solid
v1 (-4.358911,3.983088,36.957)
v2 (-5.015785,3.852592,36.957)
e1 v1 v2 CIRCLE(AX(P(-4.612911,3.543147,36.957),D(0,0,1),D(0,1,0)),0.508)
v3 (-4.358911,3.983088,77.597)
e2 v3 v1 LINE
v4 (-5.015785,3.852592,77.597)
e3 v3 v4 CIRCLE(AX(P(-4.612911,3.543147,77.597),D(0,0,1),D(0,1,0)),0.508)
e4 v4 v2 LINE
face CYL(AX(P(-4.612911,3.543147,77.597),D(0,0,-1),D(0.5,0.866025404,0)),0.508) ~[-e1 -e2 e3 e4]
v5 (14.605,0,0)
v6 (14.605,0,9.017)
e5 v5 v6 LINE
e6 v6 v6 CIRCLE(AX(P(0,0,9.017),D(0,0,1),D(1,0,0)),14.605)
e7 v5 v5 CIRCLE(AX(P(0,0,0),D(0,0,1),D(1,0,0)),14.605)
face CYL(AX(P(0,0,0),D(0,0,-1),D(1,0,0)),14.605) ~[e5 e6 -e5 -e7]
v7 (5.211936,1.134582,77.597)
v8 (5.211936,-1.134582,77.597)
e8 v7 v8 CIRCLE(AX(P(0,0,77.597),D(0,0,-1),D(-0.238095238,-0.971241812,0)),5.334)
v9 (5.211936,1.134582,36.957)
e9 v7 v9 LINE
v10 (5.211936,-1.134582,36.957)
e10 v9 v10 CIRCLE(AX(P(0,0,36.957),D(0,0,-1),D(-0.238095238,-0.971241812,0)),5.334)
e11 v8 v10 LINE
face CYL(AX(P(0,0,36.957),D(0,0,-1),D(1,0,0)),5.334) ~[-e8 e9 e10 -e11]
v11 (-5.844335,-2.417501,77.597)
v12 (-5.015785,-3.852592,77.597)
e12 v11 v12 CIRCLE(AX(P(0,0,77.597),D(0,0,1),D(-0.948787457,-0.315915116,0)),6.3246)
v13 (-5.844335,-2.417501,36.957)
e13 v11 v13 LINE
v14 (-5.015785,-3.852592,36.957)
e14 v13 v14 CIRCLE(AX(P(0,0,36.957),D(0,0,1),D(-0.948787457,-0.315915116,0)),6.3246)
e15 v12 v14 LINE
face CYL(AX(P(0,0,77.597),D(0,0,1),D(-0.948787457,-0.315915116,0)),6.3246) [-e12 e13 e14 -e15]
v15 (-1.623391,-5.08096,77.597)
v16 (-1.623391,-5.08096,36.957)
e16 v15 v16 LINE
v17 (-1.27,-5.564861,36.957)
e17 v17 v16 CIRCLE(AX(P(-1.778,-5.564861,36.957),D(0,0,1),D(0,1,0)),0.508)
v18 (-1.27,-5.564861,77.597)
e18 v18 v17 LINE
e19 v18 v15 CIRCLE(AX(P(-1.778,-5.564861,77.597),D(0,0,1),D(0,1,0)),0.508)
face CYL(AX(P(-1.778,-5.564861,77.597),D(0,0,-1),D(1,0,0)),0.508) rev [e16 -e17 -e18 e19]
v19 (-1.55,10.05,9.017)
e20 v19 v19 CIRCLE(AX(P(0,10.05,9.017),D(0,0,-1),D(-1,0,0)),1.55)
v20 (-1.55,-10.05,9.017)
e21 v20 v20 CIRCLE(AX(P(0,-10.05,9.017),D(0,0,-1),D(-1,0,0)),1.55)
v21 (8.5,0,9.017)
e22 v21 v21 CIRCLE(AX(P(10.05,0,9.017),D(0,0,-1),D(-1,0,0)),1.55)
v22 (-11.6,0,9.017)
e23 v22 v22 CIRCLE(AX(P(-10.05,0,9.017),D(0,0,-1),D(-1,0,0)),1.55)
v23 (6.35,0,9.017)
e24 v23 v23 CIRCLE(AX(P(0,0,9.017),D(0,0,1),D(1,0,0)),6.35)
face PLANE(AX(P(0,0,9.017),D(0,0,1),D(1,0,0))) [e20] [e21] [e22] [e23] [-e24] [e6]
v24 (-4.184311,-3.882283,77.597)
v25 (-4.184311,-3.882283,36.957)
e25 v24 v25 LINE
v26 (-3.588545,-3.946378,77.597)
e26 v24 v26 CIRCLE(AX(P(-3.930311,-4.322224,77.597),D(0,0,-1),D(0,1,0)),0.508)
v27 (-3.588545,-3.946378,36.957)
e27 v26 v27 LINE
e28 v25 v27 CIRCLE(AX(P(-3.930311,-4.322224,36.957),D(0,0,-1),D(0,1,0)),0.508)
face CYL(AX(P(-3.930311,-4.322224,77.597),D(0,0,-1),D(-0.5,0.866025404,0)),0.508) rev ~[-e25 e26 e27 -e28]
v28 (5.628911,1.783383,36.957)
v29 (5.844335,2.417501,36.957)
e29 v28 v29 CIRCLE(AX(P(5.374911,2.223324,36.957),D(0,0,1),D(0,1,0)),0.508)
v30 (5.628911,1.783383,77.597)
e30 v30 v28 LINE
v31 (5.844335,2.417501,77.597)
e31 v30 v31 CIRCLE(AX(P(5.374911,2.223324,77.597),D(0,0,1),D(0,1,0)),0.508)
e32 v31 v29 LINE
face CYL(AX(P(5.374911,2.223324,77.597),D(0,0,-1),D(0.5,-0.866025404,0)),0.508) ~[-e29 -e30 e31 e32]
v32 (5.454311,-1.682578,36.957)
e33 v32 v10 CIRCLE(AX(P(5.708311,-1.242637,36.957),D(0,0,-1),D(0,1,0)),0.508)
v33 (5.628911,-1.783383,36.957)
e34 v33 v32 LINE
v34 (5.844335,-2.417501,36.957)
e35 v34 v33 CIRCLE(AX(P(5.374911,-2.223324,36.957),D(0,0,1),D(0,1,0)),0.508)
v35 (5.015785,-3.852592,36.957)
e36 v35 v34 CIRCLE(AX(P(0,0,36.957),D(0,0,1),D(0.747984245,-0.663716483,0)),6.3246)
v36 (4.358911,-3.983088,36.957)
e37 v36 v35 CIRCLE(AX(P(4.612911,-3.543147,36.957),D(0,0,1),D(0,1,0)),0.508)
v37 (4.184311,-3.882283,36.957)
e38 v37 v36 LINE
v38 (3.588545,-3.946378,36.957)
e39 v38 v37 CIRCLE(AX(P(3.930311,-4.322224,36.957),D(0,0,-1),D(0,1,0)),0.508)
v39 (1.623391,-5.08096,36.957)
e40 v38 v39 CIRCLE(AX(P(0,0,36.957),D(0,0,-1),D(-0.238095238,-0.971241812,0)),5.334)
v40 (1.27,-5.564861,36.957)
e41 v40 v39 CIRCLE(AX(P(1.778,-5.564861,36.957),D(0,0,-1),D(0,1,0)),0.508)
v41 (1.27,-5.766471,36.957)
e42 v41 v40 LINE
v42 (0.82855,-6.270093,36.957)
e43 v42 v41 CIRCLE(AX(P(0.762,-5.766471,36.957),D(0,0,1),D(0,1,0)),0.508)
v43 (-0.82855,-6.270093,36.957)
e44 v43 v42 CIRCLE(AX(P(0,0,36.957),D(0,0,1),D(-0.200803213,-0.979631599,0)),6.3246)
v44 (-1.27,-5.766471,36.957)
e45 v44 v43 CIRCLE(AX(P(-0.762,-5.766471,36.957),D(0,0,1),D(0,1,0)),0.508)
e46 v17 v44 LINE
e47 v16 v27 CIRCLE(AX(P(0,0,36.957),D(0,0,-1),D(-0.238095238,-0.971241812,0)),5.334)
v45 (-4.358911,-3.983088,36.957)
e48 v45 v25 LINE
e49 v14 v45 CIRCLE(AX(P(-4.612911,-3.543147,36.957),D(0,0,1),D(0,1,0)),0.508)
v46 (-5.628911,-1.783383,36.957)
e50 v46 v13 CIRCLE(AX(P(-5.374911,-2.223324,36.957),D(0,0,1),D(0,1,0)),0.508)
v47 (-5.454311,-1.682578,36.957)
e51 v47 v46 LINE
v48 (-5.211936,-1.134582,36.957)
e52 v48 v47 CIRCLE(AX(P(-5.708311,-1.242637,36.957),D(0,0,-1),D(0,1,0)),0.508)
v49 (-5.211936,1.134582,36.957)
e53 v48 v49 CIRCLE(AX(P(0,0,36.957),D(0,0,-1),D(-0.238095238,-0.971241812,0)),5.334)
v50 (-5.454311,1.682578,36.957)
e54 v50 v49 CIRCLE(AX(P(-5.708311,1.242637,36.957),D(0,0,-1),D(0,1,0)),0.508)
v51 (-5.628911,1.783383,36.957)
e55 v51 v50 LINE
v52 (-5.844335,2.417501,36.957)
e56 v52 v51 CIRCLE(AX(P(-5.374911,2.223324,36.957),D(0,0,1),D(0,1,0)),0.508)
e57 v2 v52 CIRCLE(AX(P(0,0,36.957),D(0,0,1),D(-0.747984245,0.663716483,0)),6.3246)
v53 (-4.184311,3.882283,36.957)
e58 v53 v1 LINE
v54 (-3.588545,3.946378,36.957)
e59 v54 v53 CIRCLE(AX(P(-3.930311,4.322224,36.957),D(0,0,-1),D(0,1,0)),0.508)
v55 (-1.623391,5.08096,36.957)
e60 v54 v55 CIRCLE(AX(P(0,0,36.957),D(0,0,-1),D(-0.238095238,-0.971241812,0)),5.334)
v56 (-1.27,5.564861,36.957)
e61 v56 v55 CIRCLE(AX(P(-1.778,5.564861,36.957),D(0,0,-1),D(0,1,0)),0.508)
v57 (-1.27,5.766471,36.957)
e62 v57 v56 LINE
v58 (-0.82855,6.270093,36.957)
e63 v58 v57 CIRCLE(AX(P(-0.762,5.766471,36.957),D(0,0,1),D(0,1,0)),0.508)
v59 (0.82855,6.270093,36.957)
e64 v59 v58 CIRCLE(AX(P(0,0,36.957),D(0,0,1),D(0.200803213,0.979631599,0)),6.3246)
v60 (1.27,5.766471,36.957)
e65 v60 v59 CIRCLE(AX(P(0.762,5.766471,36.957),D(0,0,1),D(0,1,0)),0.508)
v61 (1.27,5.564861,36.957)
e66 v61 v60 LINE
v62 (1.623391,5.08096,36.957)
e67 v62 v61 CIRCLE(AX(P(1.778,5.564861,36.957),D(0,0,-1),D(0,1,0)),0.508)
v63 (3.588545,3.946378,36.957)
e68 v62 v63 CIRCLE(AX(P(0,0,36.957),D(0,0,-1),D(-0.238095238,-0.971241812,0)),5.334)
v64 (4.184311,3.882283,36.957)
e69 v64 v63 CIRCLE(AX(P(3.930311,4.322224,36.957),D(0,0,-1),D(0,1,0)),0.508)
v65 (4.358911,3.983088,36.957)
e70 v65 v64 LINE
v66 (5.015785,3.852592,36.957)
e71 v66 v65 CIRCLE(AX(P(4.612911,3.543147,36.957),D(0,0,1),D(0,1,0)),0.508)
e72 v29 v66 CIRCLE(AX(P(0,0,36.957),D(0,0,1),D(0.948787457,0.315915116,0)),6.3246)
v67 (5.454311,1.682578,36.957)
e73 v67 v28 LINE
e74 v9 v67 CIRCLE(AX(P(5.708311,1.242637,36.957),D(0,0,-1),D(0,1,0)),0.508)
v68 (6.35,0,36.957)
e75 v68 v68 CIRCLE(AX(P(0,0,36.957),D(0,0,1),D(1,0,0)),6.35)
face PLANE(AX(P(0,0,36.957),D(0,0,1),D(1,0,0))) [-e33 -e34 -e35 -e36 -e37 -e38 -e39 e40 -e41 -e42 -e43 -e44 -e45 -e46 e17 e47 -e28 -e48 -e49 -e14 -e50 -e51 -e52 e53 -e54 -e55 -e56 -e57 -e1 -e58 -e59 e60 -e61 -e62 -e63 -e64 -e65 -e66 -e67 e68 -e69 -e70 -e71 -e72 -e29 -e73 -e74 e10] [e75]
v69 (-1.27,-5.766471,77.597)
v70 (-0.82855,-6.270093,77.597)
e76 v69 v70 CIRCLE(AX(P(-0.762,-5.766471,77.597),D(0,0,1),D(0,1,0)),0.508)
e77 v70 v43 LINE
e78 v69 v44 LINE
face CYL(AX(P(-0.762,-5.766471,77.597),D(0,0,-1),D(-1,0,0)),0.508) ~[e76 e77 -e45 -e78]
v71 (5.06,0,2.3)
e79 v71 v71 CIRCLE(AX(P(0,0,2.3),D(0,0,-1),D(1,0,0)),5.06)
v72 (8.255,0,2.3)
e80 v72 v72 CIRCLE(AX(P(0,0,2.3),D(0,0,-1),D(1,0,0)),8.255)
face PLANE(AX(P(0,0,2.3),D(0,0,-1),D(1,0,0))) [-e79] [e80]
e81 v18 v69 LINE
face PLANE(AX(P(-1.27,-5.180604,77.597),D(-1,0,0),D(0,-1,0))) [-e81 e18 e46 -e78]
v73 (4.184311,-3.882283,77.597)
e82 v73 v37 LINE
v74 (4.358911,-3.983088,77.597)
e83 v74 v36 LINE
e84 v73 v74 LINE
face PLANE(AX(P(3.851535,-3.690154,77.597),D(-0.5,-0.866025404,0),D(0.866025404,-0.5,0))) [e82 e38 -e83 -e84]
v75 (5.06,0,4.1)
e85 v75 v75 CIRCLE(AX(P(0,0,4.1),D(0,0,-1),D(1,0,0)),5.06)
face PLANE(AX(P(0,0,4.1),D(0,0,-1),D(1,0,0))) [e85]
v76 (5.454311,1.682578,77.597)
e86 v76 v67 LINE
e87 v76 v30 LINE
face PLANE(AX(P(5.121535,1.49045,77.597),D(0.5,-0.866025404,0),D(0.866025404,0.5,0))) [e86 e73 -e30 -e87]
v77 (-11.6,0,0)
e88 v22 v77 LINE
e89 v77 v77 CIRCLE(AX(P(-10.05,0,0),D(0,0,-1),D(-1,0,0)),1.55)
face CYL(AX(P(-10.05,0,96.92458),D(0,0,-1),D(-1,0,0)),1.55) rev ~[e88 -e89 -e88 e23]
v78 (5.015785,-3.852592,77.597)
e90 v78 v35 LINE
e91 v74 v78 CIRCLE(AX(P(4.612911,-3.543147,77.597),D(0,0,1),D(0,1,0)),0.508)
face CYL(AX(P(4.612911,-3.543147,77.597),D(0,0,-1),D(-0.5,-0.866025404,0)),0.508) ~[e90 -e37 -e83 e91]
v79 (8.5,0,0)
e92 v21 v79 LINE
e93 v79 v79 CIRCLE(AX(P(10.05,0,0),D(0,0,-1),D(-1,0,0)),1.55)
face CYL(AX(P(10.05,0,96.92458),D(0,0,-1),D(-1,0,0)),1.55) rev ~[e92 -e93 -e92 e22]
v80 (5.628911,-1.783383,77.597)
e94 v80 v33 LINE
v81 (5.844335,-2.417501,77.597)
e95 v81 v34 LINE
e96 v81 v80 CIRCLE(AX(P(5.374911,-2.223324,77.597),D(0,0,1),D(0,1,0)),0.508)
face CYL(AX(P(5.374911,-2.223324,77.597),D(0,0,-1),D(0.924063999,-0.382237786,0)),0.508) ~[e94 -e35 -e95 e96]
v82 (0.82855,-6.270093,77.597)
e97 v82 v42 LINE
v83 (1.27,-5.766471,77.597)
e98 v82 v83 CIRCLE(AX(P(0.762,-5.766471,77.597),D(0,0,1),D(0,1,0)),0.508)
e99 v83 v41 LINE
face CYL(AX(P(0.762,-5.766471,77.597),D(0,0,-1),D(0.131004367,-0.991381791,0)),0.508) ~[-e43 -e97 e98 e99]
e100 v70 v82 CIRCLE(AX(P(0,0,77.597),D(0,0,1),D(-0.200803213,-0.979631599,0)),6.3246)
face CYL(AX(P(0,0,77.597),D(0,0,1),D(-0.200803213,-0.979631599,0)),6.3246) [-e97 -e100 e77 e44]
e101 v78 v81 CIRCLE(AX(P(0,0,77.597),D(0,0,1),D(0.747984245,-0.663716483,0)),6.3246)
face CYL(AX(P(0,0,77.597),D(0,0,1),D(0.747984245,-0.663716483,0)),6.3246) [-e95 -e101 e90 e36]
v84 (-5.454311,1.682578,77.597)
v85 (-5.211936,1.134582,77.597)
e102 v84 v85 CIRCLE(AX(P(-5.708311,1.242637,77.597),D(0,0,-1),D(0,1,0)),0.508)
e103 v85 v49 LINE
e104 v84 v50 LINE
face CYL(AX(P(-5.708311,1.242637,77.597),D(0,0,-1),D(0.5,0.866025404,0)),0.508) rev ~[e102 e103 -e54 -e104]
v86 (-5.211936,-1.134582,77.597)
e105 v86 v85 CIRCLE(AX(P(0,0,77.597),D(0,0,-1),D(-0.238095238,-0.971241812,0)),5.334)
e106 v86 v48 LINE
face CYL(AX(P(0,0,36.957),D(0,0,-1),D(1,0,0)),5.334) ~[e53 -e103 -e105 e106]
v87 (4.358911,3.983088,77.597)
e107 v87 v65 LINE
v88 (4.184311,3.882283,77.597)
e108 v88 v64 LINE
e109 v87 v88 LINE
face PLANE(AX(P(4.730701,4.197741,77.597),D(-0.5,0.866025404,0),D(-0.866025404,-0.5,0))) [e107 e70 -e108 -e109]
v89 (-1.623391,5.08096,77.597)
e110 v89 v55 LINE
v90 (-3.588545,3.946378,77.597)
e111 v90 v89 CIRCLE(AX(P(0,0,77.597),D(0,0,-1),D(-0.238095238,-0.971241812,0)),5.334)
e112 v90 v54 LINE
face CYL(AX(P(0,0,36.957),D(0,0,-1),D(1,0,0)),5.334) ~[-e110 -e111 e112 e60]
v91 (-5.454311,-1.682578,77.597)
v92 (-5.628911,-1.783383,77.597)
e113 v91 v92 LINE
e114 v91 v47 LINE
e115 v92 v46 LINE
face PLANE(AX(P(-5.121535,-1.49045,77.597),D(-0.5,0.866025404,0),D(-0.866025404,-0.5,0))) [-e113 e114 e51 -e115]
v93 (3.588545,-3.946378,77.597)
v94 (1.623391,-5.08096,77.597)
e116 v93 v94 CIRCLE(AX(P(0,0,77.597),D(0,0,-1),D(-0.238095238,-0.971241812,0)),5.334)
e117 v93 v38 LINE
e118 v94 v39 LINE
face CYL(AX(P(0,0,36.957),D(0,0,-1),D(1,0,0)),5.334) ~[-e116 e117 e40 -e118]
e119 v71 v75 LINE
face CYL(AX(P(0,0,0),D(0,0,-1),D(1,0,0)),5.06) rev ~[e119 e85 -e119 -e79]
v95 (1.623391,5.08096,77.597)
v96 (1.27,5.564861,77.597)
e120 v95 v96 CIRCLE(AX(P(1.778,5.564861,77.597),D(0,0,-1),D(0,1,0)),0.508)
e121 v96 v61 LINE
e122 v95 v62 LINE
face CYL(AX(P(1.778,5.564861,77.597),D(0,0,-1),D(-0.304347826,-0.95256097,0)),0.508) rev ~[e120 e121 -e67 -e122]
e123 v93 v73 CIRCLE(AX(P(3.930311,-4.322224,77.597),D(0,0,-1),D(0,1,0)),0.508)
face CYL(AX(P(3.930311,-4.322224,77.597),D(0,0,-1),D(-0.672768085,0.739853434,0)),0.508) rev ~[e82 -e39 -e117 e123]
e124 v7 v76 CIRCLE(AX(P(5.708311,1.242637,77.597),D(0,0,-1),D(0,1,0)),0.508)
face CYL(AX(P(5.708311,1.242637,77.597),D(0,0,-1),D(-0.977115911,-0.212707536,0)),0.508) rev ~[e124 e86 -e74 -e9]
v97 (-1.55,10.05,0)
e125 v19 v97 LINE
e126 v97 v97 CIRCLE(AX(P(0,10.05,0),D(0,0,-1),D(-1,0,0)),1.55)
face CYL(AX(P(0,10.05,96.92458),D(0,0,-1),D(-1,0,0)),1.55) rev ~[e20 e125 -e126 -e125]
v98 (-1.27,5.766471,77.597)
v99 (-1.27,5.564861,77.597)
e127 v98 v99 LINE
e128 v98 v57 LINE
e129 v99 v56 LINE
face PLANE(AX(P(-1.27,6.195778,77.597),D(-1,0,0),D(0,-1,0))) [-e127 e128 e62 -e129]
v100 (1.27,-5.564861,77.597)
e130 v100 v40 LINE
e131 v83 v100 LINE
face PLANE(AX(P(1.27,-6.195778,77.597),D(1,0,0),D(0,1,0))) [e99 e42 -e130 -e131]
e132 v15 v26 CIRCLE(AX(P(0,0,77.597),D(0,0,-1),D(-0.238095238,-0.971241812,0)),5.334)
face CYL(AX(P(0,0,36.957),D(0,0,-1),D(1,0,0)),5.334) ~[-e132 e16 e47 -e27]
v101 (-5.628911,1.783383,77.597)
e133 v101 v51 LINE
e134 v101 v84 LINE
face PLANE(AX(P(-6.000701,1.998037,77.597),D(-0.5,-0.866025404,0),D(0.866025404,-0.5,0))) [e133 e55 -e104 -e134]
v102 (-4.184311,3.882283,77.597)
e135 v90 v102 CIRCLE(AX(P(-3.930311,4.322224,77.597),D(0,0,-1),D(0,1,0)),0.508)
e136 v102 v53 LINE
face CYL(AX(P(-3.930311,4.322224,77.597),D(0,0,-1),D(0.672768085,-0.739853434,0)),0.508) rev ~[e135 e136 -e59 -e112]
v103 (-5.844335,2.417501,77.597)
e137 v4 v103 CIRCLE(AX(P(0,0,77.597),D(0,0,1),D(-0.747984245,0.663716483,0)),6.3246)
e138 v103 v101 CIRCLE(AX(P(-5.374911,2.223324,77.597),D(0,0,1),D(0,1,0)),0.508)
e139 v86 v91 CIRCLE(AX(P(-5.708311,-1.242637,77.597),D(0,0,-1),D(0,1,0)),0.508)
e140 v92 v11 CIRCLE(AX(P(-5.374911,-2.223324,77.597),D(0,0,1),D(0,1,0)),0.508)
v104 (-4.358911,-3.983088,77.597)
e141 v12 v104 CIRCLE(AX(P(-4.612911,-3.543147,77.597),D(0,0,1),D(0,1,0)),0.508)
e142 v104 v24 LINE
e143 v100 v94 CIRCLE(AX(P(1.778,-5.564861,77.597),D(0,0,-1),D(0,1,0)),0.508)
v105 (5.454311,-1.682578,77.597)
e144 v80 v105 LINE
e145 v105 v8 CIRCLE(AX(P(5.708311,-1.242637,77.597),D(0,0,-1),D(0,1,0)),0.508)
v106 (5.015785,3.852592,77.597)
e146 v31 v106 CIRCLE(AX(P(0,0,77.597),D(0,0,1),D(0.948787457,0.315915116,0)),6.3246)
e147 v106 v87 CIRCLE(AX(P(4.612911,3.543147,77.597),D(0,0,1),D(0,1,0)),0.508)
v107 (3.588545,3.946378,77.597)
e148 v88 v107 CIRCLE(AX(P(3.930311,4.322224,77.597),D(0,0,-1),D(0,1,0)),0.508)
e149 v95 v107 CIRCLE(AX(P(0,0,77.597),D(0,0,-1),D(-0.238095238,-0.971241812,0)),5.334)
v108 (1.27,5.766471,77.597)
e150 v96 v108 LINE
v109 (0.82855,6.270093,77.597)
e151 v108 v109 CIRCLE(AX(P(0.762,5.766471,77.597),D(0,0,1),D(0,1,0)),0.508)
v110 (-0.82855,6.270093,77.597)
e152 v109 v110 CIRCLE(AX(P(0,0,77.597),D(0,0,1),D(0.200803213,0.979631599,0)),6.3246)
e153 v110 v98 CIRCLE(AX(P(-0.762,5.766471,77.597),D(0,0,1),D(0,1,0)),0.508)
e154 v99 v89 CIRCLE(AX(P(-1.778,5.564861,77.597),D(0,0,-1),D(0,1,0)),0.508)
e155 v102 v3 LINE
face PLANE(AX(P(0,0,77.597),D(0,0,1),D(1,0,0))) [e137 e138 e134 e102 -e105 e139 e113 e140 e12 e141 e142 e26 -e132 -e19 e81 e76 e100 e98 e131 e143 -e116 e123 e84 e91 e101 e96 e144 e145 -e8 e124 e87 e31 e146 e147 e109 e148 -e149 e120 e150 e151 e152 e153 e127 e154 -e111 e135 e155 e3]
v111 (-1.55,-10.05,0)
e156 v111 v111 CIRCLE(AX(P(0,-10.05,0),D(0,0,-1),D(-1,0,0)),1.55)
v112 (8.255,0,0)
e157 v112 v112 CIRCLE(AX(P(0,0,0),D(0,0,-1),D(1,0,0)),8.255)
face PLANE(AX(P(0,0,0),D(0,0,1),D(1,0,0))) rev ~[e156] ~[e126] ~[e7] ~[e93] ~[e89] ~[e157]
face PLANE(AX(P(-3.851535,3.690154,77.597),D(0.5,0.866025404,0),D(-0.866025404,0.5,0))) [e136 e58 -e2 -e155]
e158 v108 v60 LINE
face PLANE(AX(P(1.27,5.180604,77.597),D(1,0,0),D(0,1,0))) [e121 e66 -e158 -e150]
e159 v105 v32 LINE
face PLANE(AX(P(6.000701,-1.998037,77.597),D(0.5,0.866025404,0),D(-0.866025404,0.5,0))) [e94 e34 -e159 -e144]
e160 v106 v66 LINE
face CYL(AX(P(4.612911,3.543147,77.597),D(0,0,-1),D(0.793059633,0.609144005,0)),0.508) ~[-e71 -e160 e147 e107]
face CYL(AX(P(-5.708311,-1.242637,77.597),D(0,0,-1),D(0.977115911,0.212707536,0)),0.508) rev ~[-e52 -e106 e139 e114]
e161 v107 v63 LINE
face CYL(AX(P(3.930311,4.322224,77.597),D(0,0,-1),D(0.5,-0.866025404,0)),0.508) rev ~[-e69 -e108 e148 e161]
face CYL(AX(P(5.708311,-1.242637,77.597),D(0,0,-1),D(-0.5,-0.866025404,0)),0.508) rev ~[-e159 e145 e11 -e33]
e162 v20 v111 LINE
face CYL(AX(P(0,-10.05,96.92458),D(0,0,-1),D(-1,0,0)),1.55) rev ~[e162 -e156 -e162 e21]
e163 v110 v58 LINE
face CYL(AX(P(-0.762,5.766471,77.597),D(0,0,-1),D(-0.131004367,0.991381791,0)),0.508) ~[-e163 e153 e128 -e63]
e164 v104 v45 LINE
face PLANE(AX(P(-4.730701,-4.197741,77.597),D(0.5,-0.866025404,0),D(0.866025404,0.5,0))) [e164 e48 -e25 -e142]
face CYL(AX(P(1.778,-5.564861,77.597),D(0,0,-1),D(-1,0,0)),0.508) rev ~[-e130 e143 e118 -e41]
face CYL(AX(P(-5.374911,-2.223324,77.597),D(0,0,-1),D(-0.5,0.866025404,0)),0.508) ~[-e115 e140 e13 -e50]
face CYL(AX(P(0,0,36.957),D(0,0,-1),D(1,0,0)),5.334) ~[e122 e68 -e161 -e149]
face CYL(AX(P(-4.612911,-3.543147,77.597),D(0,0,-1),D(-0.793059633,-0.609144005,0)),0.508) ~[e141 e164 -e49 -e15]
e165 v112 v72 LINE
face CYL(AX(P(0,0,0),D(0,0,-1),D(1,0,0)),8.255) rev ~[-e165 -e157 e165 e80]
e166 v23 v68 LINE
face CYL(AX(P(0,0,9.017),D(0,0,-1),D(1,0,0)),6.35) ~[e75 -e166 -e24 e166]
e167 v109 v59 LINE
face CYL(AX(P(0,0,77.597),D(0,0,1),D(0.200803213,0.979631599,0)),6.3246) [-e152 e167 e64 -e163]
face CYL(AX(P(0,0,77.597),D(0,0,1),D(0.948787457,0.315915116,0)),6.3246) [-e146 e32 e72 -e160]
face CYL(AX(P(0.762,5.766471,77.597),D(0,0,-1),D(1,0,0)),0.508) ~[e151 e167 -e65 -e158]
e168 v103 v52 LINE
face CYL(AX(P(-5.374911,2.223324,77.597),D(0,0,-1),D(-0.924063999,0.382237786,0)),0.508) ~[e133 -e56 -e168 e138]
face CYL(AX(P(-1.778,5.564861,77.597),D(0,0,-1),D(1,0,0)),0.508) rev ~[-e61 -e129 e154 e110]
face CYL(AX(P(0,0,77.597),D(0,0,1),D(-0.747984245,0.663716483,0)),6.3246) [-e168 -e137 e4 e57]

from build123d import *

# Parameters (mm, degrees)
F0_R             = 14.605
F1_DEPTH         = 9.017
F2_R             = 6.35
F3_DEPTH         = 27.94
F4_R             = 5.334
F5_DEPTH         = 40.64
F6_R             = 8.255
F7_DEPTH         = 2.3
F8_R             = 5.06
F9_DEPTH         = 4.1
F11_D            = 3.1
F13_DEPTH        = 40.64
F13_COPIES_COUNT = 6
F14_R            = 0.508


# Not quite as in the source:
# - a pattern or mirror of a feature is missing from the dataset's text; its kind, count and spacing are read off the source's solid


with BuildPart() as f1:
    # F0 (on Top) → F1 (new body)
    with BuildSketch(Plane.XY):
        Circle(F0_R)
    extrude(amount=F1_DEPTH)

    # F2 (on face) → F3 (join)
    with BuildSketch(Plane.XY.offset(9.017)):
        Circle(F2_R)
    extrude(amount=F3_DEPTH)

    # F4 (on face) → F5 (join)
    with BuildSketch(Plane.XY.offset(36.957)):
        Circle(F4_R)
    extrude(amount=F5_DEPTH)

    # F6 (on face) → F7 (cut)
    with BuildSketch(Plane(origin=(0, 0, 0), x_dir=(1, 0, 0), z_dir=(0, 0, -1))):
        Circle(F6_R)
    extrude(amount=-F7_DEPTH, mode=Mode.SUBTRACT)

    # F8 (on face) → F9 (cut)
    with BuildSketch(Plane(origin=(0, 0, 0), x_dir=(1, 0, 0), z_dir=(0, 0, -1))):
        Circle(F8_R)
    extrude(amount=-F9_DEPTH, mode=Mode.SUBTRACT)

    # F11 (through all)
    with Locations(Plane.XY.offset(9.017)):
        with Locations((0, -10.05), (-10.05, 0), (0, 10.05), (10.05, 0)):
            Hole(F11_D / 2)

    # F12 (on face) → F13 (join, through all)
    with BuildSketch(Plane.XY.offset(77.597)):
        with BuildLine():
            Line((-1.27, -5.1806038258), (-1.27, -6.1957780109))
            ThreePointArc((-1.27, -6.1957780109), (0, -6.3246), (1.27, -6.1957780109))
            Line((1.27, -6.1957780109), (1.27, -5.1806038258))
            ThreePointArc((1.27, -5.1806038258), (0, -5.334), (-1.27, -5.1806038258))
        make_face()
    f13 = extrude(amount=-F13_DEPTH)

    # F13_copies: F13 ×6 about axis
    f13_copies_axis = Axis((0, 0, 0), (0, 0, 1))
    for i in range(1, F13_COPIES_COUNT):
        add(f13.rotate(f13_copies_axis, i * 360 / F13_COPIES_COUNT))

    # F14
    f14_edges = [f1.edges().sort_by_distance(p)[0] for p in [
        (1.27, -6.195778, 57.277),
        (1.27, -5.180604, 57.277),
        (-1.27, -6.195778, 57.277),
        (-1.27, -5.180604, 57.277),
        (3.851535, -3.690154, 57.277),
        (4.730701, -4.197741, 57.277),
        (6.000701, -1.998037, 57.277),
        (5.121535, -1.49045, 57.277),
        (5.121535, 1.49045, 57.277),
        (6.000701, 1.998037, 57.277),
        (4.730701, 4.197741, 57.277),
        (3.851535, 3.690154, 57.277),
        (1.27, 5.180604, 57.277),
        (1.27, 6.195778, 57.277),
        (-1.27, 6.195778, 57.277),
        (-1.27, 5.180604, 57.277),
        (-3.851535, 3.690154, 57.277),
        (-4.730701, 4.197741, 57.277),
        (-6.000701, 1.998037, 57.277),
        (-5.121535, 1.49045, 57.277),
        (-5.121535, -1.49045, 57.277),
        (-6.000701, -1.998037, 57.277),
        (-4.730701, -4.197741, 57.277),
        (-3.851535, -3.690154, 57.277),
    ]]
    fillet(f14_edges, radius=F14_R)


solid = f1.part
